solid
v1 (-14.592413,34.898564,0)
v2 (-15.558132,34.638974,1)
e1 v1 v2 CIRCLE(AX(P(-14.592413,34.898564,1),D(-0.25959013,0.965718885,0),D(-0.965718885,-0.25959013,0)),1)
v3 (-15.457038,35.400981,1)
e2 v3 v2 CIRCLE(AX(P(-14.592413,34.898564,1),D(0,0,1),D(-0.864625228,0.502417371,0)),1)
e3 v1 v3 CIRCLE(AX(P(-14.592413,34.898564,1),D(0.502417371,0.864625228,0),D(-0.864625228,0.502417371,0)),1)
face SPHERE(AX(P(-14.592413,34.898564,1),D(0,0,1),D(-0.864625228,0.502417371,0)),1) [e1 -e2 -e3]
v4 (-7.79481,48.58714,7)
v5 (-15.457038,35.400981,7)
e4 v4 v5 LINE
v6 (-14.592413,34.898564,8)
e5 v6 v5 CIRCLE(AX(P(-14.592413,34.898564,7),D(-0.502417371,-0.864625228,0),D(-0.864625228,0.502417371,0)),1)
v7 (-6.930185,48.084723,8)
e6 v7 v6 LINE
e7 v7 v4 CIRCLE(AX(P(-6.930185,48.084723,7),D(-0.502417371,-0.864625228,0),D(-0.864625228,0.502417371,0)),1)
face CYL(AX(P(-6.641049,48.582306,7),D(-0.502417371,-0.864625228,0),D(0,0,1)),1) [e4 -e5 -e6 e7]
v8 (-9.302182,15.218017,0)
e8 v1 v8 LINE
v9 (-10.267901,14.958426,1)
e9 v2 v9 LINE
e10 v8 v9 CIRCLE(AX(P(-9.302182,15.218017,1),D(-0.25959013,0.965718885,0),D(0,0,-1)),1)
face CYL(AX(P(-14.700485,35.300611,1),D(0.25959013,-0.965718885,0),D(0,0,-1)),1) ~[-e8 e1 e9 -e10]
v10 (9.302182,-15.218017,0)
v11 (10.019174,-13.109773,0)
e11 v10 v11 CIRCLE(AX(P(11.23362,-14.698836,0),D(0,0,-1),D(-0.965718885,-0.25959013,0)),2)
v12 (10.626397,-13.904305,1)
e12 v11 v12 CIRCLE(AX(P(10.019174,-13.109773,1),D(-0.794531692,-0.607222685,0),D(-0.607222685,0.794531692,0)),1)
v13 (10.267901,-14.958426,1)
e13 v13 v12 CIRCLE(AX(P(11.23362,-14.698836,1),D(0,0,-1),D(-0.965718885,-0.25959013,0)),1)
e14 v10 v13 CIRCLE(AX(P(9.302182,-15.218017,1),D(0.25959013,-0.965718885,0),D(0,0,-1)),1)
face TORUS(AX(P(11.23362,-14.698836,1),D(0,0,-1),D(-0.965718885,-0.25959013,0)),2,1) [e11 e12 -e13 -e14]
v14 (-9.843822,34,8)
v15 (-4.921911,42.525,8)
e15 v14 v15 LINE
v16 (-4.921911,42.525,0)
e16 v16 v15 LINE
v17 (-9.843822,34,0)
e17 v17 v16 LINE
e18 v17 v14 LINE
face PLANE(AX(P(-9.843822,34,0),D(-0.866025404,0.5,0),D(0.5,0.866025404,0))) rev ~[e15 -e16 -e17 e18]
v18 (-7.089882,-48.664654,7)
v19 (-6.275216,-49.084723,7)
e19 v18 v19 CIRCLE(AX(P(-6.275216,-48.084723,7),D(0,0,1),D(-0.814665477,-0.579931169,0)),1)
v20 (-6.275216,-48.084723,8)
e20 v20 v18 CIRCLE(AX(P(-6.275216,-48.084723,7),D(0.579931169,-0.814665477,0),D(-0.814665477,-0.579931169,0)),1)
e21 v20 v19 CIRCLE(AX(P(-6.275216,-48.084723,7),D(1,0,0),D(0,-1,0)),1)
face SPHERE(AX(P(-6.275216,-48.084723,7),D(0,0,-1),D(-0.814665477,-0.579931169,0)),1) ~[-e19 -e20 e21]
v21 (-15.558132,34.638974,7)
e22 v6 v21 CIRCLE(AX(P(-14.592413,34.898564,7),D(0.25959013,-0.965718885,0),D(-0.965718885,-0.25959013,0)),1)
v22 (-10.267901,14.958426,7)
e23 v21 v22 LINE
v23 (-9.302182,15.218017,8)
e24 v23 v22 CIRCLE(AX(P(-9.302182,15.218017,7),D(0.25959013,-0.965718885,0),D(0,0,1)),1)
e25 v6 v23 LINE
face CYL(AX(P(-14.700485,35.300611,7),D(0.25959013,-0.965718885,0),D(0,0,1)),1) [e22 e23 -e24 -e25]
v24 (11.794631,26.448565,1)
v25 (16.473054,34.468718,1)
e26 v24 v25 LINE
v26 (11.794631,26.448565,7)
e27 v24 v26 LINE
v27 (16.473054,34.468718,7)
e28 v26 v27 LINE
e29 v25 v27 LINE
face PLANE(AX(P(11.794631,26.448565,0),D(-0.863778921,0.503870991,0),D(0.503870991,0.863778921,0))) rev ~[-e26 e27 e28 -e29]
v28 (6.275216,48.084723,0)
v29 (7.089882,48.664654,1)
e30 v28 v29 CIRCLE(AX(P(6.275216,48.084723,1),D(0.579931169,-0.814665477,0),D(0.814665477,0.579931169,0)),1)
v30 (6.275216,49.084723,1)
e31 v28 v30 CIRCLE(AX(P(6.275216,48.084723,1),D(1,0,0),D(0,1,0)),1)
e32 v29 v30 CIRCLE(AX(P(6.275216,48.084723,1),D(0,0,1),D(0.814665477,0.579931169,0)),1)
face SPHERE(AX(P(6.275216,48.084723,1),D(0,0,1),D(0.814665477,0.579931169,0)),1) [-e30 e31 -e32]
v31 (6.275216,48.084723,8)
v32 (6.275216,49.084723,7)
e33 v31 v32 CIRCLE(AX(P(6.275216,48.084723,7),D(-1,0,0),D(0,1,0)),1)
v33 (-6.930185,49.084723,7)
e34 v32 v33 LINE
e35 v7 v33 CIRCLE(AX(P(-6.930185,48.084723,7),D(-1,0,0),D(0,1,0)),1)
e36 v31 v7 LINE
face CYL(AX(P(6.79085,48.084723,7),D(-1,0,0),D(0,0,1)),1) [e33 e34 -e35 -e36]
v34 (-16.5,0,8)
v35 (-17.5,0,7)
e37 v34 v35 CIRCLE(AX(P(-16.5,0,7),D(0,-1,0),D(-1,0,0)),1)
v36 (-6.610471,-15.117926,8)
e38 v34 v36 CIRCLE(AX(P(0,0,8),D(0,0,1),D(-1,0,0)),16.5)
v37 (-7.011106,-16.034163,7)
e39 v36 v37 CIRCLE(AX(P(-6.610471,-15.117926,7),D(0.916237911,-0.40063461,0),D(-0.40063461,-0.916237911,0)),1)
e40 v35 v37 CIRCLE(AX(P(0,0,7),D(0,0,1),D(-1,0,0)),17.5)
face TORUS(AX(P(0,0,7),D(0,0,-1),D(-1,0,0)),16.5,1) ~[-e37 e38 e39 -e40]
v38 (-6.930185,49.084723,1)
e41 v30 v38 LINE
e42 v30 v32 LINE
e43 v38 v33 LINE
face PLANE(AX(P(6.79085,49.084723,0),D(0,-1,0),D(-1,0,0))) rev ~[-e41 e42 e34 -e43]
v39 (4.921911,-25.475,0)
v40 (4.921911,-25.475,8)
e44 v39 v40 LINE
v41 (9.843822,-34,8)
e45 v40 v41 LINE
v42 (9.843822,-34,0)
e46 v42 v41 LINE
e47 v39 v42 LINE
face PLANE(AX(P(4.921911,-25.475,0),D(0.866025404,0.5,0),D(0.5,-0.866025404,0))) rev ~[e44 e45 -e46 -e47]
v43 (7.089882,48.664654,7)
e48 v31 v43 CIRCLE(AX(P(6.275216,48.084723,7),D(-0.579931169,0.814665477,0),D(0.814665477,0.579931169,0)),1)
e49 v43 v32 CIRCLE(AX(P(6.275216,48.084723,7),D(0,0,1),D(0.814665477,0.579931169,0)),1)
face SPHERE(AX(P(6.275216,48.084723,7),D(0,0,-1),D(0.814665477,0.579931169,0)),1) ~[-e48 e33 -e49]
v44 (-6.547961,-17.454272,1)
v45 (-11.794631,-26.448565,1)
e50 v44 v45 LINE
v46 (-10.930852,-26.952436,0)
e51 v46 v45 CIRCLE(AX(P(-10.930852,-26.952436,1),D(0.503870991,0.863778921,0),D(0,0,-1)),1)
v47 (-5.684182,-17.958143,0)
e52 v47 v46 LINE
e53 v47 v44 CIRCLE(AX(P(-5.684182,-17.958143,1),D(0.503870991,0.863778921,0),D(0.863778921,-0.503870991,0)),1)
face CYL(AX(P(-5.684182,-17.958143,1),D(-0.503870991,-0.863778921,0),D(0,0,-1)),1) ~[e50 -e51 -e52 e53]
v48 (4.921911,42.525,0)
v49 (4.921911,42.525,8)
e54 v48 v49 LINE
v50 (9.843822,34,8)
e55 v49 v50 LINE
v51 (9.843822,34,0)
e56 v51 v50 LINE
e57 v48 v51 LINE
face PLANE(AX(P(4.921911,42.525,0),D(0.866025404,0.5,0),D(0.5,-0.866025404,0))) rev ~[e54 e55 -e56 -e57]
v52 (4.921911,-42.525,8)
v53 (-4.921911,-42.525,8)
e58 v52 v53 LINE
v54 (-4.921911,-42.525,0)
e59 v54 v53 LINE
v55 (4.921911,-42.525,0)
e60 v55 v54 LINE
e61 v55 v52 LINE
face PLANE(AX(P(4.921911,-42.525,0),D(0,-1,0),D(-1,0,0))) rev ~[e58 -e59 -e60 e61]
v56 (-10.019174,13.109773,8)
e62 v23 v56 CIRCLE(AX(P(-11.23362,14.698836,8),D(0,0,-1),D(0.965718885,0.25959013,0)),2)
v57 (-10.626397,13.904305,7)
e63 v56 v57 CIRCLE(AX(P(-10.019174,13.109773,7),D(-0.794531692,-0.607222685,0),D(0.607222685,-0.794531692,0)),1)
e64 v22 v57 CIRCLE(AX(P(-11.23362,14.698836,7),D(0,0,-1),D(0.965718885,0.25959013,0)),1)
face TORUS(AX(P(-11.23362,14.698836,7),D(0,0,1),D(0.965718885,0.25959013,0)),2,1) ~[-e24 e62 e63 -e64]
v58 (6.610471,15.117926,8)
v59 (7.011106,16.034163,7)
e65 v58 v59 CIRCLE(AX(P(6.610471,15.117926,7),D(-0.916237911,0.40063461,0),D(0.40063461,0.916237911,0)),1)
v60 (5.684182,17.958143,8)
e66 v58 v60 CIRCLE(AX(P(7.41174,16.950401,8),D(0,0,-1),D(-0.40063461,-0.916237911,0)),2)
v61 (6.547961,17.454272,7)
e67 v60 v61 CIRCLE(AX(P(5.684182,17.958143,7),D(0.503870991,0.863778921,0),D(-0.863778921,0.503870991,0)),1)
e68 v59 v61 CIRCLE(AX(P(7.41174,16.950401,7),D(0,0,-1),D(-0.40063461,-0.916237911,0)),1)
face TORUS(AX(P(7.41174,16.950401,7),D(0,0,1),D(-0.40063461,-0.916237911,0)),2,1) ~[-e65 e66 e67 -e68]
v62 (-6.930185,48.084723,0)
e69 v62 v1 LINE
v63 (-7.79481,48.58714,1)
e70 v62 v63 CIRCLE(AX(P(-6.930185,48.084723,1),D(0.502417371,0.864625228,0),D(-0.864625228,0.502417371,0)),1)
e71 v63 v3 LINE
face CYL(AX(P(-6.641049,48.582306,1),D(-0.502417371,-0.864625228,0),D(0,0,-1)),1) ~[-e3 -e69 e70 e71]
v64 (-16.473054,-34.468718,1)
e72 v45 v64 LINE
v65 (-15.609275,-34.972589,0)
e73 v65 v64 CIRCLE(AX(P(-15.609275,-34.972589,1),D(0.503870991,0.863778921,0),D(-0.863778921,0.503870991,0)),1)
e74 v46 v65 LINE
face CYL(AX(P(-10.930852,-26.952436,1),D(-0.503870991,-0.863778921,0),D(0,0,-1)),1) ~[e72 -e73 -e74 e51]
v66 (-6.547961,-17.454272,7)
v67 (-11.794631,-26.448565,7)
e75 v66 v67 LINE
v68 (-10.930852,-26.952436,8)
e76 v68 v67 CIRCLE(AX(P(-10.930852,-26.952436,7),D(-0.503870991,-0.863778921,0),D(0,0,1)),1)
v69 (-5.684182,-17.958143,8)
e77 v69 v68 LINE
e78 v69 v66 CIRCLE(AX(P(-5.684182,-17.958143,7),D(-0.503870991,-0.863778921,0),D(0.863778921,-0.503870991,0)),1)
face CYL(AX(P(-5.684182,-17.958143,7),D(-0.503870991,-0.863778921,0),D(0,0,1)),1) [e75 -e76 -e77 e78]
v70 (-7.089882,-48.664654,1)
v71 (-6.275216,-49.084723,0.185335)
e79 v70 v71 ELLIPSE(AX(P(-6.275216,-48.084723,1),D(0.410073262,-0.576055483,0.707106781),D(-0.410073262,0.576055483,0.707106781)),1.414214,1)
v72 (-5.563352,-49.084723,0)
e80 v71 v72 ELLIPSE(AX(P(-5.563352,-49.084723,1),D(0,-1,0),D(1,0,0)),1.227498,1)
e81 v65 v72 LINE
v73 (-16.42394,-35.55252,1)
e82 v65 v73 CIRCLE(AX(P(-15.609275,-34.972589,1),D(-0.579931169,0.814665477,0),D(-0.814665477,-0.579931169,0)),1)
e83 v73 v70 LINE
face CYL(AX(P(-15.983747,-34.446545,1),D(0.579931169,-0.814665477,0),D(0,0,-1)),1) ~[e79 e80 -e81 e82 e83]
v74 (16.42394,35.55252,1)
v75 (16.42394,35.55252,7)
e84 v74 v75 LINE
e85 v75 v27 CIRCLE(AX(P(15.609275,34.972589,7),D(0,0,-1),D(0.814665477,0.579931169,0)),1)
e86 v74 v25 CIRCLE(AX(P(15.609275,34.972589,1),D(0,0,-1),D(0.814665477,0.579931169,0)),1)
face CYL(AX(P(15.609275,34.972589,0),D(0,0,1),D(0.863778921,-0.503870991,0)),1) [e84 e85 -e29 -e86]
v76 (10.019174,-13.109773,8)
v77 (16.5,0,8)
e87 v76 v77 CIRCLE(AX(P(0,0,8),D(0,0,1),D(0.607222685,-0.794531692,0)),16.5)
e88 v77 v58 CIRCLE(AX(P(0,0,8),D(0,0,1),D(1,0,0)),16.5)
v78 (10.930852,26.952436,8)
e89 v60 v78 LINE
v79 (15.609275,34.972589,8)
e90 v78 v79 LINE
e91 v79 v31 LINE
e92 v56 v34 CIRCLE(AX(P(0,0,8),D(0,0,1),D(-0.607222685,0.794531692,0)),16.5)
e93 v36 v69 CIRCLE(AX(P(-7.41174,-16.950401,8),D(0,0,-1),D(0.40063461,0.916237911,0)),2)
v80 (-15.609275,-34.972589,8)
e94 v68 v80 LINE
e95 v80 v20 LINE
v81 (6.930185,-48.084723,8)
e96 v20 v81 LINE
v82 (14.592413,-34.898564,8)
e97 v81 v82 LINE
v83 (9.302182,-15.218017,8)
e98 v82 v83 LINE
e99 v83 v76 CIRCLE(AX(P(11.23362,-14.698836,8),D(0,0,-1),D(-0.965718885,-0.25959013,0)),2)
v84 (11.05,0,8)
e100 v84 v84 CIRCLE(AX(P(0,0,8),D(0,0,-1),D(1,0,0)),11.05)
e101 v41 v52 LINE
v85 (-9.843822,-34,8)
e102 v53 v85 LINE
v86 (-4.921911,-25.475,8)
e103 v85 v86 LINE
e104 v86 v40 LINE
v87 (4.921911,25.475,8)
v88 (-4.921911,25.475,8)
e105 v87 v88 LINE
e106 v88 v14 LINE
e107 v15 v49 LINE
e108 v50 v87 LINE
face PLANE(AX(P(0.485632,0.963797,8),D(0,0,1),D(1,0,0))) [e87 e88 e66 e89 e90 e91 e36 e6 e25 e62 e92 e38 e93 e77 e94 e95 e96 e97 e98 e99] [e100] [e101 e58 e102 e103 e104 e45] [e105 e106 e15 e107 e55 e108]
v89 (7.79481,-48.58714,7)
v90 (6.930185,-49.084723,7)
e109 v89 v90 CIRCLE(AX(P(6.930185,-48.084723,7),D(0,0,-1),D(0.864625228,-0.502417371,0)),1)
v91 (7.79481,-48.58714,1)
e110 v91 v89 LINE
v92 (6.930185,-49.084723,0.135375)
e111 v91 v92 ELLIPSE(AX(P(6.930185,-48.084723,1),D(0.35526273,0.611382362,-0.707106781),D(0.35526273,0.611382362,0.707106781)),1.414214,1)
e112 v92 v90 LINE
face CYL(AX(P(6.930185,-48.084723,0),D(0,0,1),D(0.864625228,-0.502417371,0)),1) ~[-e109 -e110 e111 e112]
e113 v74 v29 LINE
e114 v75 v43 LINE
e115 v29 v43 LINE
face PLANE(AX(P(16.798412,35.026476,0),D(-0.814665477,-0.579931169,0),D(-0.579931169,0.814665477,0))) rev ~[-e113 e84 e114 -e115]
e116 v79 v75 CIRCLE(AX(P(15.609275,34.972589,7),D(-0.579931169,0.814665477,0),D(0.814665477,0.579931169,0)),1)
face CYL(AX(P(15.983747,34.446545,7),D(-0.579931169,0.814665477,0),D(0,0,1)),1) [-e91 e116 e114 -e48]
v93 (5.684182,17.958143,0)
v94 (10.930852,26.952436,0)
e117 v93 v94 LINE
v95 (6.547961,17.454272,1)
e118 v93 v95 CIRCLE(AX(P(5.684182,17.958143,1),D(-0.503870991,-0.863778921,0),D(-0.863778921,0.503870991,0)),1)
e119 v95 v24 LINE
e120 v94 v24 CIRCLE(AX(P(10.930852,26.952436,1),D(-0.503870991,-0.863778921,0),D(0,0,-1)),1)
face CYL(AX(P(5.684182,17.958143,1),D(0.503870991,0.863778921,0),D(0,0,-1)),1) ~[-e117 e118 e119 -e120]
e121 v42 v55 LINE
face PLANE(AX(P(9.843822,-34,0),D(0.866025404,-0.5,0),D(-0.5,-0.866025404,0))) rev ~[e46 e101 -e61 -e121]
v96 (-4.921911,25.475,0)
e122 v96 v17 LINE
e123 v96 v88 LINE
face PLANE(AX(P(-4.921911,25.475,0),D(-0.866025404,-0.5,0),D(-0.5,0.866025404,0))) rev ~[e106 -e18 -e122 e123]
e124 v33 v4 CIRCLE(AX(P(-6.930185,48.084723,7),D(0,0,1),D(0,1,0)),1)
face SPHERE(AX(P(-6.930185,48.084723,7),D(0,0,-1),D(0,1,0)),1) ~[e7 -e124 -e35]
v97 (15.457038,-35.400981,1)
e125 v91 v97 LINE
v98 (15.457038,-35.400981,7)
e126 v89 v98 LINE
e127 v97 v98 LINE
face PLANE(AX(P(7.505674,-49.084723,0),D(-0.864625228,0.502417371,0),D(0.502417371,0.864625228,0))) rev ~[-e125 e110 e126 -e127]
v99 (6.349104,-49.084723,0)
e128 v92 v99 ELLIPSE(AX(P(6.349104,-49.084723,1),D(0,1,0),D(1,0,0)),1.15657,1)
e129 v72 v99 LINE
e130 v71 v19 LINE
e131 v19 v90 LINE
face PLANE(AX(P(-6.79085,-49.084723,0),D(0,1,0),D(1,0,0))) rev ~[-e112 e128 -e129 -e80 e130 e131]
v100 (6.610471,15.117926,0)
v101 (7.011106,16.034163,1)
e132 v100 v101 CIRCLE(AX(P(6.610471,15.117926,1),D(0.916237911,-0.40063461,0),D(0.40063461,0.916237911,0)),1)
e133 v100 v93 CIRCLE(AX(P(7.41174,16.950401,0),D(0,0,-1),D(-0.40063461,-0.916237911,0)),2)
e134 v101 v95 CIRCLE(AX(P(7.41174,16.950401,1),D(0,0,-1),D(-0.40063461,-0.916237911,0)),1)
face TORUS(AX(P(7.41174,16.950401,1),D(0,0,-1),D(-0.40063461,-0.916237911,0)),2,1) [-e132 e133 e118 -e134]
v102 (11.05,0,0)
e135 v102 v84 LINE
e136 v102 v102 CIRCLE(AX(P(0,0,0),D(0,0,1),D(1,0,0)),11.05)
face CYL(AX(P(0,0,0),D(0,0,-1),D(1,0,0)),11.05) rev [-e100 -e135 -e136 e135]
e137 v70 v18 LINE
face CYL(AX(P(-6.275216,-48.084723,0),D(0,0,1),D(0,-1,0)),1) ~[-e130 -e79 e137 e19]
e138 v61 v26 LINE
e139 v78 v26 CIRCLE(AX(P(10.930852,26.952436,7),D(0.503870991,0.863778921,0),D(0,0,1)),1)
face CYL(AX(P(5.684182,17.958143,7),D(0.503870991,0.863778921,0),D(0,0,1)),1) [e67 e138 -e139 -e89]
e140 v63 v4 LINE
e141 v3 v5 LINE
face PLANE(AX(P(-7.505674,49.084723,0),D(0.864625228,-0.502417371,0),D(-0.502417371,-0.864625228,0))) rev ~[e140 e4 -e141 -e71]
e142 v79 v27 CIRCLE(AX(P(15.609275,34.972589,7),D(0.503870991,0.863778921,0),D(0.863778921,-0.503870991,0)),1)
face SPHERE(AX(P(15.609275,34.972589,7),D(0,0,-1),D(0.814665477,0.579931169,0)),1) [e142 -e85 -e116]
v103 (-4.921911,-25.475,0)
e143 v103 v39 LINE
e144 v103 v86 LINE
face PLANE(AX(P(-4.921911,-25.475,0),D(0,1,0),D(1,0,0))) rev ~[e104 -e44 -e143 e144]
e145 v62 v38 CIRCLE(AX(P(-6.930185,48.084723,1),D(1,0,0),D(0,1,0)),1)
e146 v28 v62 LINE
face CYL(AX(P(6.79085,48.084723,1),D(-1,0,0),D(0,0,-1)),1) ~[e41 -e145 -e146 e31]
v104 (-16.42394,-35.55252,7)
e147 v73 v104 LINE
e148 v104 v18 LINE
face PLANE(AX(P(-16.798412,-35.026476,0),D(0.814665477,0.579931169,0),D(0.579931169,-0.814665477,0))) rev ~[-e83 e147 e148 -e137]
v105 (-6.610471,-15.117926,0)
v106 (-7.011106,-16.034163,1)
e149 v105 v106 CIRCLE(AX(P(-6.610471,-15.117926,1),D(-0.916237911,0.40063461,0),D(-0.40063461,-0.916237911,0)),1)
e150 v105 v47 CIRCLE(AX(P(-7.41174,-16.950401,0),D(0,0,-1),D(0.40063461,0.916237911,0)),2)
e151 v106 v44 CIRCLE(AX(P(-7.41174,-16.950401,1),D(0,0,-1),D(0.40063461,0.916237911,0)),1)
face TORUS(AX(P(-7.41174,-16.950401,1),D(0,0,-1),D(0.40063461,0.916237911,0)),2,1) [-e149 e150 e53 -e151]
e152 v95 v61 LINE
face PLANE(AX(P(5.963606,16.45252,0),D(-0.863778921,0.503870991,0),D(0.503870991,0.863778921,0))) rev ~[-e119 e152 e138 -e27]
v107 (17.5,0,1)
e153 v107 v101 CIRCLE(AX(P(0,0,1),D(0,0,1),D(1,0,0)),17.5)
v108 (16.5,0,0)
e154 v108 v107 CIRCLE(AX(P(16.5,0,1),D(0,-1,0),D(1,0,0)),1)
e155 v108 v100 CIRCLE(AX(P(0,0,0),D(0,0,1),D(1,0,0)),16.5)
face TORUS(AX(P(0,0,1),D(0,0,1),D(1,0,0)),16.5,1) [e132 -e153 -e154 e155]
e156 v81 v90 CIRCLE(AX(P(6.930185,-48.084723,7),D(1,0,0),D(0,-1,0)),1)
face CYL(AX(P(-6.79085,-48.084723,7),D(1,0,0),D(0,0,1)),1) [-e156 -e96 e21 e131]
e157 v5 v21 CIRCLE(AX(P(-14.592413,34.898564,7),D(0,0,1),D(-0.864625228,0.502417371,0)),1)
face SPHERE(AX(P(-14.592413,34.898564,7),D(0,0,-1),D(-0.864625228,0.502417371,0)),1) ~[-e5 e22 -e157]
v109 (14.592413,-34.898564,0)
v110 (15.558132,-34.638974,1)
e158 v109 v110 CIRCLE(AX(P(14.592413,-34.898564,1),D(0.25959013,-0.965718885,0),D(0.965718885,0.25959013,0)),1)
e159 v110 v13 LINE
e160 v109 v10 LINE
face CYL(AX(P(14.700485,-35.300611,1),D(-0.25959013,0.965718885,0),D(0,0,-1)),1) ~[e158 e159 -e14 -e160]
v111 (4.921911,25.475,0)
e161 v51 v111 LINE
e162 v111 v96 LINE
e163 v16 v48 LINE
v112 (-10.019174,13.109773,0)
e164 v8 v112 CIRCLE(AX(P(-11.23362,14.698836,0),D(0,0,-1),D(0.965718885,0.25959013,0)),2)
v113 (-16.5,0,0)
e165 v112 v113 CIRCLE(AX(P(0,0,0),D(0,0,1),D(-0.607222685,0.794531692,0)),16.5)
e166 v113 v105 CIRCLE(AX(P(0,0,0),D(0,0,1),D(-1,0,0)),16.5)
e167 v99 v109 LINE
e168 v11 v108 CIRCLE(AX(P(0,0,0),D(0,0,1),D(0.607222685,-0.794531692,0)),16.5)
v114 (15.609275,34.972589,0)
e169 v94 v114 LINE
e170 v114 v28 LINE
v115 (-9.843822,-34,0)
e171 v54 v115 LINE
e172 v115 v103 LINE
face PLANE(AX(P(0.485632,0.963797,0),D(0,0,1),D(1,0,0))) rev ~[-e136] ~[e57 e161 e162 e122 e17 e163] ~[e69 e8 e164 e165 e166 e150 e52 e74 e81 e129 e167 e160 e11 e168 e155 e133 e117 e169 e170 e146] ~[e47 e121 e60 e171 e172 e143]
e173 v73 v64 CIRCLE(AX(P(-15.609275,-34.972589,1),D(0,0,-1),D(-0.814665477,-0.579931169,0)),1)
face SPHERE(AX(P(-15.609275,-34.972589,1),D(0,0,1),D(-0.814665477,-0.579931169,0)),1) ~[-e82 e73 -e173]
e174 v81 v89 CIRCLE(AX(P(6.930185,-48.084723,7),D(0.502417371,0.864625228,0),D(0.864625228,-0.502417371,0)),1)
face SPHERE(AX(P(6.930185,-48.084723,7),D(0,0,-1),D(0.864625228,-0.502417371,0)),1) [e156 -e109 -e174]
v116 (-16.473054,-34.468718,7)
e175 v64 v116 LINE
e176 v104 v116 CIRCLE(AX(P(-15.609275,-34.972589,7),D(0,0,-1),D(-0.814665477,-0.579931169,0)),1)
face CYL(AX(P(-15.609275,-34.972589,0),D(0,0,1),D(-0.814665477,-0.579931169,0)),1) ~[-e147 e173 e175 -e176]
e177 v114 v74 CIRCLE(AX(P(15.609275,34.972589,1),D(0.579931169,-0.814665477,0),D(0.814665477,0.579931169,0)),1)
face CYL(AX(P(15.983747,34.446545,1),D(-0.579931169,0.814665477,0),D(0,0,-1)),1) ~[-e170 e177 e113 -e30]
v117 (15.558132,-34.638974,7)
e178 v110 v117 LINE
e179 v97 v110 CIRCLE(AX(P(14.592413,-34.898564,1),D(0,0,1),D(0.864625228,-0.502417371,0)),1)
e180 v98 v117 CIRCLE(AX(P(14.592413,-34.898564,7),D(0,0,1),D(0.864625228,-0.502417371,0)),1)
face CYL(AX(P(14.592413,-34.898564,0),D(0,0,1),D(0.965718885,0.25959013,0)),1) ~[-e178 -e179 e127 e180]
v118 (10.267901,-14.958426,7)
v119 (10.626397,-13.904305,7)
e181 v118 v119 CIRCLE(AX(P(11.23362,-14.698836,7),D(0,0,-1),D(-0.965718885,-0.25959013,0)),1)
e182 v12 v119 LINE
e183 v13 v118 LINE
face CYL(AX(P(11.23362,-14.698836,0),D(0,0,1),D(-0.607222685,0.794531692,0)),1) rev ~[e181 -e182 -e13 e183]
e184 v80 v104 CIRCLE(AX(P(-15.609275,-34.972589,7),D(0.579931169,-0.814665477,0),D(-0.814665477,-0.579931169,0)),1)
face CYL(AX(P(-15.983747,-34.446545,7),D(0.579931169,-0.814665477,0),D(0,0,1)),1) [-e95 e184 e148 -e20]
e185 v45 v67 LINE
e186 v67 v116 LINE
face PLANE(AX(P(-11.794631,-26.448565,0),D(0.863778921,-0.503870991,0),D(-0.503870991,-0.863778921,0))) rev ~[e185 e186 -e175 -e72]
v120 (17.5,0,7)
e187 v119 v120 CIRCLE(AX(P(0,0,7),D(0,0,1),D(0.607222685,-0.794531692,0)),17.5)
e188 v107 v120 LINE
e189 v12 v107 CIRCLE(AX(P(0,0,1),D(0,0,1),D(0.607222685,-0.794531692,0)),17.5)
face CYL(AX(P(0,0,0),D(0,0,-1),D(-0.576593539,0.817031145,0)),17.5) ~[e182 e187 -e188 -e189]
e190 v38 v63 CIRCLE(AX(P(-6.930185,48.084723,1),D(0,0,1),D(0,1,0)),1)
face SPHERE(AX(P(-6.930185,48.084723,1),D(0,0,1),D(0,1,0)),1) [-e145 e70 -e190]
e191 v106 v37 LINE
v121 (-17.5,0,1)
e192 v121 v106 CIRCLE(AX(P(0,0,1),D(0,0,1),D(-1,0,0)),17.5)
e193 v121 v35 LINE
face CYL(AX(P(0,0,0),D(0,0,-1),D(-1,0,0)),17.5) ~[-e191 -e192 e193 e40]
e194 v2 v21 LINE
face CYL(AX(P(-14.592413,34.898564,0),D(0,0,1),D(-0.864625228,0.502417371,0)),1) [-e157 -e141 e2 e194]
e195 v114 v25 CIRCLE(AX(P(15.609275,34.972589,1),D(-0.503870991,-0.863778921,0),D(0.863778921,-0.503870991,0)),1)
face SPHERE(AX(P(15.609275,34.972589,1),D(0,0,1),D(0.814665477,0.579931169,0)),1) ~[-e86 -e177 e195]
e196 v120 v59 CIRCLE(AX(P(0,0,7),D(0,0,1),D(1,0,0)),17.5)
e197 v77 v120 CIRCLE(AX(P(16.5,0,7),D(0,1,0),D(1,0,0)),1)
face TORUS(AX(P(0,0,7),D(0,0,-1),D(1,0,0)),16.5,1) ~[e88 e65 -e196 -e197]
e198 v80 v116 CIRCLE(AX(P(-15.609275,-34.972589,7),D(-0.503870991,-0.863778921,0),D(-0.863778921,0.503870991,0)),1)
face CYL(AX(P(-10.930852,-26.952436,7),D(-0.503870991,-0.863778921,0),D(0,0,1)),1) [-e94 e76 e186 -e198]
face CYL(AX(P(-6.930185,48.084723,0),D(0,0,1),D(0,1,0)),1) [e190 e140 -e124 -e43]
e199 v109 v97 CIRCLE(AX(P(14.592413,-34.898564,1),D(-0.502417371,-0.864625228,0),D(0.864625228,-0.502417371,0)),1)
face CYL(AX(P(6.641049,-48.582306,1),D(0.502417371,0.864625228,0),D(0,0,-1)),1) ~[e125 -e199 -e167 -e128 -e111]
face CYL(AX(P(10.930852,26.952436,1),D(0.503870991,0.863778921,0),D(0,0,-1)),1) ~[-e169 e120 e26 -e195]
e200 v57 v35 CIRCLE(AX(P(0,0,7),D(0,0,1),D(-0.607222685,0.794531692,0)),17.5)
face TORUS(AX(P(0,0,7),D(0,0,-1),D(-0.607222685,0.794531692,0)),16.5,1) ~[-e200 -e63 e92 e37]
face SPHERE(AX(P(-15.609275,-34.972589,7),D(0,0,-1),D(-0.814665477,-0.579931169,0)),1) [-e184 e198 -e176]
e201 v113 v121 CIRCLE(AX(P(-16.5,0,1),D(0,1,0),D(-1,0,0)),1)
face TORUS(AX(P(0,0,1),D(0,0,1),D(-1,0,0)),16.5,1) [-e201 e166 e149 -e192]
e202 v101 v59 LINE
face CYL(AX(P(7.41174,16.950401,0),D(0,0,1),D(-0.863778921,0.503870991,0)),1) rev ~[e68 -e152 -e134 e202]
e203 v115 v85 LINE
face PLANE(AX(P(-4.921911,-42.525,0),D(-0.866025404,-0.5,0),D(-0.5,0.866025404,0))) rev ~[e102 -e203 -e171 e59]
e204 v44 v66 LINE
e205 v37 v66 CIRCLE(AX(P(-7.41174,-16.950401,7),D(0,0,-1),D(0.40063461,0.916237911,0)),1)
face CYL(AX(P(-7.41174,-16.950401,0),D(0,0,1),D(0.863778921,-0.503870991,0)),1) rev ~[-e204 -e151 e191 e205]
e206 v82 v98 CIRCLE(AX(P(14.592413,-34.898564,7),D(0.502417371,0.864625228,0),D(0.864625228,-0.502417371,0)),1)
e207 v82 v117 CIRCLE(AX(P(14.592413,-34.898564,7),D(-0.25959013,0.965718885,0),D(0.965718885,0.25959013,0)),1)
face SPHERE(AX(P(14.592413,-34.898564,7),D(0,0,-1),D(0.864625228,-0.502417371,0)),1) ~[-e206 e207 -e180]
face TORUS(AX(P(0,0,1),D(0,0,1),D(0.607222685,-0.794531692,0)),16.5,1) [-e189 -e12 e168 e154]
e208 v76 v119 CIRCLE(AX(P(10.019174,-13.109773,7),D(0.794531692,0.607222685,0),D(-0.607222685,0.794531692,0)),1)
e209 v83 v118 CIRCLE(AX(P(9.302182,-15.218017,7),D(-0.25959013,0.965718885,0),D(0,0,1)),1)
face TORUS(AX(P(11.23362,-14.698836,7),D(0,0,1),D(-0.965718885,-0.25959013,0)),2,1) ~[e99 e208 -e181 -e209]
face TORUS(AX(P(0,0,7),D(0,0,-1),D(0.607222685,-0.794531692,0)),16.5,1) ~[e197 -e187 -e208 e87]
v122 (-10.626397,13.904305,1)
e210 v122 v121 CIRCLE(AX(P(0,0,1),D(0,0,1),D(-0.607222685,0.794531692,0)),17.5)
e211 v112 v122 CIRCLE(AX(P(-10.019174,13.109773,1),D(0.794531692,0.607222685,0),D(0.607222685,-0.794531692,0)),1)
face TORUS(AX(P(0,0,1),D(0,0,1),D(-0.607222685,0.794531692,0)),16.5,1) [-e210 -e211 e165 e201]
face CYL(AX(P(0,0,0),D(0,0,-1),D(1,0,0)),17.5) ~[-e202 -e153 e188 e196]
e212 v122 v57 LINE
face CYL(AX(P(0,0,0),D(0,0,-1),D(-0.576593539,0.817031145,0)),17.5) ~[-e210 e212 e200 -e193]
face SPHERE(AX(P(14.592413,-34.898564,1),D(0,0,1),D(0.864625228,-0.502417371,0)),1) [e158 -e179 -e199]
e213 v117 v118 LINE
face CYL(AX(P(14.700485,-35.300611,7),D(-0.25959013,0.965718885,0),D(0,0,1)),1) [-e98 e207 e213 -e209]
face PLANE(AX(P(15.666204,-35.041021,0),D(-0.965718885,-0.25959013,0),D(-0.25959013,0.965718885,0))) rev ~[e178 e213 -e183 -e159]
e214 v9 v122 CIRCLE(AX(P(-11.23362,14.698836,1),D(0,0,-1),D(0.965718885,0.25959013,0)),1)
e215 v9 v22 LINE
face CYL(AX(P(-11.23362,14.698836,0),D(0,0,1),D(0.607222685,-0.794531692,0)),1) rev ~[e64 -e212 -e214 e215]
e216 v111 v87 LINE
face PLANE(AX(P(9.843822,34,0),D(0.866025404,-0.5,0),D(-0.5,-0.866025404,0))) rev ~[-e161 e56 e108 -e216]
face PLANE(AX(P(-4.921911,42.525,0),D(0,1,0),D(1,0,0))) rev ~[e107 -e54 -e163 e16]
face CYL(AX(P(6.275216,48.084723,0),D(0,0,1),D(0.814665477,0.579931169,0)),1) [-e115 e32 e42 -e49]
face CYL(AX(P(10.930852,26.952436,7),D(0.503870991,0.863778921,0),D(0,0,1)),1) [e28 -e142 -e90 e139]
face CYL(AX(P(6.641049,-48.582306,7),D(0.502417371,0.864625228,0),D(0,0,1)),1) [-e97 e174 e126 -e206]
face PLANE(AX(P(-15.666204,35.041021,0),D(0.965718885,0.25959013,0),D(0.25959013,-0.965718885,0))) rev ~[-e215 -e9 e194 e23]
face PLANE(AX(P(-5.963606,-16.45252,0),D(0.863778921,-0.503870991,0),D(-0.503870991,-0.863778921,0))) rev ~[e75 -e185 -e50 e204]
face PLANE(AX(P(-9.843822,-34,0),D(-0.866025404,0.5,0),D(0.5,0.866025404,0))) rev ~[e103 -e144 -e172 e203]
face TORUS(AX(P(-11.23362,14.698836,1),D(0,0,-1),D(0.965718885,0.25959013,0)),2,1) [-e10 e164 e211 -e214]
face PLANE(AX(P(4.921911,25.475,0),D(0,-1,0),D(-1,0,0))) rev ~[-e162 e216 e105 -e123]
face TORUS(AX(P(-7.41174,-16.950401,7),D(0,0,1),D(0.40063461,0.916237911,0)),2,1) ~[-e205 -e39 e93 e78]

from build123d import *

# Parameters (mm, degrees)
F0_R     = 11.05
F1_DEPTH = 8
F2_COUNT = 2
F3_F1_R  = 1
F3_F2_R  = 1


with BuildPart() as f1:
    # F0 (on Top) → F1 (new body)
    with BuildSketch(Plane.XY):
        with BuildLine():
            ThreePointArc((-10.0903869269, 14.2980450295), (-8.0519633873, -15.5375636961), (17.5, 0))
            ThreePointArc((17.5, 0), (14.3285222663, 10.0470617428), (5.9636057526, 16.4525197592))
            ThreePointArc((5.9636057526, 16.4525197592), (-2.3276642918, 17.3445086106), (-10.0903869269, 14.2980450295))
        make_face()
        Circle(F0_R, mode=Mode.SUBTRACT)
        with BuildLine():
            ThreePointArc((-10.0903869269, 14.2980450295), (-2.3276642918, 17.3445086106), (5.9636057526, 16.4525197592))
            Line((5.9636057526, 16.4525197592), (11.7946313694, 26.4485646039))
            Line((11.7946313694, 26.4485646039), (16.7984124273, 35.0264757872))
            Line((16.7984124273, 35.0264757872), (6.7908498459, 49.0847229958))
            Line((6.7908498459, 49.0847229958), (-7.5056743808, 49.0847229958))
            Line((-7.5056743808, 49.0847229958), (-15.6662040079, 35.0410211056))
            Line((-15.6662040079, 35.0410211056), (-10.0903869269, 14.2980450295))
        make_face()
        Polygon((-4.9219110448, 42.525), (4.9219110448, 42.525), (9.8438220897, 34), (4.9219110448, 25.475), (-4.9219110448, 25.475), (-9.8438220897, 34), align=None, mode=Mode.SUBTRACT)
    extrude(amount=F1_DEPTH)

    # F2: F1 ×2 about axis
    f2_axis = Axis((0, 0, 0), (0, 0, 1))


with BuildPart() as f1_1:
    add(f1.part)
    for i in range(1, F2_COUNT):
        add(f1.part.rotate(f2_axis, i * 360 / F2_COUNT))

    # F3: fillet of radius 1 on 31 edges, made by hand

    # F3_f1
    f3_f1_edges = [f1_1.edges().sort_by_distance(p)[0] for p in [
        (10.0903869269, -14.2980450295, 4),
        (5.9636057526, 16.4525197592, 4),
        (-10.0903869269, 14.2980450295, 4),
        (-5.9636057526, -16.4525197592, 4),
    ]]
    fillet(f3_f1_edges, radius=F3_F1_R)

    # F3_f2
    f3_f2_edges = [f1_1.edges().sort_by_distance(p)[0] for p in [
        (7.5056743808, -49.0847229958, 4),
        (15.6662040079, -35.0410211056, 4),
        (11.5859391943, -42.0628720507, 0),
        (11.5859391943, -42.0628720507, 8),
        (12.9670524021, -24.9997237726, 0),
        (12.9670524021, -24.9997237726, 8),
        (16.7984124273, 35.0264757872, 4),
        (11.6731868984, 26.2403740629, 0),
        (11.6731868984, 26.2403740629, 8),
        (6.7908498459, 49.0847229958, 4),
        (11.7946311366, 42.0555993915, 0),
        (11.7946311366, 42.0555993915, 8),
        (-7.5056743808, 49.0847229958, 4),
        (-0.3574122675, 49.0847229958, 0),
        (-0.3574122675, 49.0847229958, 8),
        (-15.6662040079, 35.0410211056, 4),
        (-11.5859391943, 42.0628720507, 0),
        (-11.5859391943, 42.0628720507, 8),
        (-12.9670524021, 24.9997237726, 0),
        (-12.9670524021, 24.9997237726, 8),
        (-16.7984124273, -35.0264757872, 4),
        (-11.6731868984, -26.2403740629, 0),
        (-11.6731868984, -26.2403740629, 8),
        (-6.7908498459, -49.0847229958, 4),
        (-11.7946311366, -42.0555993915, 0),
        (-11.7946311366, -42.0555993915, 8),
        (0.3574122675, -49.0847229958, 8),
        (-6.4610233416, -16.640341221, 8),
        (-6.4610233416, -16.640341221, 0),
        (-10.2868728829, 14.376857273, 8),
        (-10.2868728829, 14.376857273, 0),
        (6.4610233416, 16.640341221, 8),
        (6.4610233416, 16.640341221, 0),
        (10.2868728829, -14.376857273, 8),
        (10.2868728829, -14.376857273, 0),
    ]]
    fillet(f3_f2_edges, radius=F3_F2_R)


solid = f1_1.part
